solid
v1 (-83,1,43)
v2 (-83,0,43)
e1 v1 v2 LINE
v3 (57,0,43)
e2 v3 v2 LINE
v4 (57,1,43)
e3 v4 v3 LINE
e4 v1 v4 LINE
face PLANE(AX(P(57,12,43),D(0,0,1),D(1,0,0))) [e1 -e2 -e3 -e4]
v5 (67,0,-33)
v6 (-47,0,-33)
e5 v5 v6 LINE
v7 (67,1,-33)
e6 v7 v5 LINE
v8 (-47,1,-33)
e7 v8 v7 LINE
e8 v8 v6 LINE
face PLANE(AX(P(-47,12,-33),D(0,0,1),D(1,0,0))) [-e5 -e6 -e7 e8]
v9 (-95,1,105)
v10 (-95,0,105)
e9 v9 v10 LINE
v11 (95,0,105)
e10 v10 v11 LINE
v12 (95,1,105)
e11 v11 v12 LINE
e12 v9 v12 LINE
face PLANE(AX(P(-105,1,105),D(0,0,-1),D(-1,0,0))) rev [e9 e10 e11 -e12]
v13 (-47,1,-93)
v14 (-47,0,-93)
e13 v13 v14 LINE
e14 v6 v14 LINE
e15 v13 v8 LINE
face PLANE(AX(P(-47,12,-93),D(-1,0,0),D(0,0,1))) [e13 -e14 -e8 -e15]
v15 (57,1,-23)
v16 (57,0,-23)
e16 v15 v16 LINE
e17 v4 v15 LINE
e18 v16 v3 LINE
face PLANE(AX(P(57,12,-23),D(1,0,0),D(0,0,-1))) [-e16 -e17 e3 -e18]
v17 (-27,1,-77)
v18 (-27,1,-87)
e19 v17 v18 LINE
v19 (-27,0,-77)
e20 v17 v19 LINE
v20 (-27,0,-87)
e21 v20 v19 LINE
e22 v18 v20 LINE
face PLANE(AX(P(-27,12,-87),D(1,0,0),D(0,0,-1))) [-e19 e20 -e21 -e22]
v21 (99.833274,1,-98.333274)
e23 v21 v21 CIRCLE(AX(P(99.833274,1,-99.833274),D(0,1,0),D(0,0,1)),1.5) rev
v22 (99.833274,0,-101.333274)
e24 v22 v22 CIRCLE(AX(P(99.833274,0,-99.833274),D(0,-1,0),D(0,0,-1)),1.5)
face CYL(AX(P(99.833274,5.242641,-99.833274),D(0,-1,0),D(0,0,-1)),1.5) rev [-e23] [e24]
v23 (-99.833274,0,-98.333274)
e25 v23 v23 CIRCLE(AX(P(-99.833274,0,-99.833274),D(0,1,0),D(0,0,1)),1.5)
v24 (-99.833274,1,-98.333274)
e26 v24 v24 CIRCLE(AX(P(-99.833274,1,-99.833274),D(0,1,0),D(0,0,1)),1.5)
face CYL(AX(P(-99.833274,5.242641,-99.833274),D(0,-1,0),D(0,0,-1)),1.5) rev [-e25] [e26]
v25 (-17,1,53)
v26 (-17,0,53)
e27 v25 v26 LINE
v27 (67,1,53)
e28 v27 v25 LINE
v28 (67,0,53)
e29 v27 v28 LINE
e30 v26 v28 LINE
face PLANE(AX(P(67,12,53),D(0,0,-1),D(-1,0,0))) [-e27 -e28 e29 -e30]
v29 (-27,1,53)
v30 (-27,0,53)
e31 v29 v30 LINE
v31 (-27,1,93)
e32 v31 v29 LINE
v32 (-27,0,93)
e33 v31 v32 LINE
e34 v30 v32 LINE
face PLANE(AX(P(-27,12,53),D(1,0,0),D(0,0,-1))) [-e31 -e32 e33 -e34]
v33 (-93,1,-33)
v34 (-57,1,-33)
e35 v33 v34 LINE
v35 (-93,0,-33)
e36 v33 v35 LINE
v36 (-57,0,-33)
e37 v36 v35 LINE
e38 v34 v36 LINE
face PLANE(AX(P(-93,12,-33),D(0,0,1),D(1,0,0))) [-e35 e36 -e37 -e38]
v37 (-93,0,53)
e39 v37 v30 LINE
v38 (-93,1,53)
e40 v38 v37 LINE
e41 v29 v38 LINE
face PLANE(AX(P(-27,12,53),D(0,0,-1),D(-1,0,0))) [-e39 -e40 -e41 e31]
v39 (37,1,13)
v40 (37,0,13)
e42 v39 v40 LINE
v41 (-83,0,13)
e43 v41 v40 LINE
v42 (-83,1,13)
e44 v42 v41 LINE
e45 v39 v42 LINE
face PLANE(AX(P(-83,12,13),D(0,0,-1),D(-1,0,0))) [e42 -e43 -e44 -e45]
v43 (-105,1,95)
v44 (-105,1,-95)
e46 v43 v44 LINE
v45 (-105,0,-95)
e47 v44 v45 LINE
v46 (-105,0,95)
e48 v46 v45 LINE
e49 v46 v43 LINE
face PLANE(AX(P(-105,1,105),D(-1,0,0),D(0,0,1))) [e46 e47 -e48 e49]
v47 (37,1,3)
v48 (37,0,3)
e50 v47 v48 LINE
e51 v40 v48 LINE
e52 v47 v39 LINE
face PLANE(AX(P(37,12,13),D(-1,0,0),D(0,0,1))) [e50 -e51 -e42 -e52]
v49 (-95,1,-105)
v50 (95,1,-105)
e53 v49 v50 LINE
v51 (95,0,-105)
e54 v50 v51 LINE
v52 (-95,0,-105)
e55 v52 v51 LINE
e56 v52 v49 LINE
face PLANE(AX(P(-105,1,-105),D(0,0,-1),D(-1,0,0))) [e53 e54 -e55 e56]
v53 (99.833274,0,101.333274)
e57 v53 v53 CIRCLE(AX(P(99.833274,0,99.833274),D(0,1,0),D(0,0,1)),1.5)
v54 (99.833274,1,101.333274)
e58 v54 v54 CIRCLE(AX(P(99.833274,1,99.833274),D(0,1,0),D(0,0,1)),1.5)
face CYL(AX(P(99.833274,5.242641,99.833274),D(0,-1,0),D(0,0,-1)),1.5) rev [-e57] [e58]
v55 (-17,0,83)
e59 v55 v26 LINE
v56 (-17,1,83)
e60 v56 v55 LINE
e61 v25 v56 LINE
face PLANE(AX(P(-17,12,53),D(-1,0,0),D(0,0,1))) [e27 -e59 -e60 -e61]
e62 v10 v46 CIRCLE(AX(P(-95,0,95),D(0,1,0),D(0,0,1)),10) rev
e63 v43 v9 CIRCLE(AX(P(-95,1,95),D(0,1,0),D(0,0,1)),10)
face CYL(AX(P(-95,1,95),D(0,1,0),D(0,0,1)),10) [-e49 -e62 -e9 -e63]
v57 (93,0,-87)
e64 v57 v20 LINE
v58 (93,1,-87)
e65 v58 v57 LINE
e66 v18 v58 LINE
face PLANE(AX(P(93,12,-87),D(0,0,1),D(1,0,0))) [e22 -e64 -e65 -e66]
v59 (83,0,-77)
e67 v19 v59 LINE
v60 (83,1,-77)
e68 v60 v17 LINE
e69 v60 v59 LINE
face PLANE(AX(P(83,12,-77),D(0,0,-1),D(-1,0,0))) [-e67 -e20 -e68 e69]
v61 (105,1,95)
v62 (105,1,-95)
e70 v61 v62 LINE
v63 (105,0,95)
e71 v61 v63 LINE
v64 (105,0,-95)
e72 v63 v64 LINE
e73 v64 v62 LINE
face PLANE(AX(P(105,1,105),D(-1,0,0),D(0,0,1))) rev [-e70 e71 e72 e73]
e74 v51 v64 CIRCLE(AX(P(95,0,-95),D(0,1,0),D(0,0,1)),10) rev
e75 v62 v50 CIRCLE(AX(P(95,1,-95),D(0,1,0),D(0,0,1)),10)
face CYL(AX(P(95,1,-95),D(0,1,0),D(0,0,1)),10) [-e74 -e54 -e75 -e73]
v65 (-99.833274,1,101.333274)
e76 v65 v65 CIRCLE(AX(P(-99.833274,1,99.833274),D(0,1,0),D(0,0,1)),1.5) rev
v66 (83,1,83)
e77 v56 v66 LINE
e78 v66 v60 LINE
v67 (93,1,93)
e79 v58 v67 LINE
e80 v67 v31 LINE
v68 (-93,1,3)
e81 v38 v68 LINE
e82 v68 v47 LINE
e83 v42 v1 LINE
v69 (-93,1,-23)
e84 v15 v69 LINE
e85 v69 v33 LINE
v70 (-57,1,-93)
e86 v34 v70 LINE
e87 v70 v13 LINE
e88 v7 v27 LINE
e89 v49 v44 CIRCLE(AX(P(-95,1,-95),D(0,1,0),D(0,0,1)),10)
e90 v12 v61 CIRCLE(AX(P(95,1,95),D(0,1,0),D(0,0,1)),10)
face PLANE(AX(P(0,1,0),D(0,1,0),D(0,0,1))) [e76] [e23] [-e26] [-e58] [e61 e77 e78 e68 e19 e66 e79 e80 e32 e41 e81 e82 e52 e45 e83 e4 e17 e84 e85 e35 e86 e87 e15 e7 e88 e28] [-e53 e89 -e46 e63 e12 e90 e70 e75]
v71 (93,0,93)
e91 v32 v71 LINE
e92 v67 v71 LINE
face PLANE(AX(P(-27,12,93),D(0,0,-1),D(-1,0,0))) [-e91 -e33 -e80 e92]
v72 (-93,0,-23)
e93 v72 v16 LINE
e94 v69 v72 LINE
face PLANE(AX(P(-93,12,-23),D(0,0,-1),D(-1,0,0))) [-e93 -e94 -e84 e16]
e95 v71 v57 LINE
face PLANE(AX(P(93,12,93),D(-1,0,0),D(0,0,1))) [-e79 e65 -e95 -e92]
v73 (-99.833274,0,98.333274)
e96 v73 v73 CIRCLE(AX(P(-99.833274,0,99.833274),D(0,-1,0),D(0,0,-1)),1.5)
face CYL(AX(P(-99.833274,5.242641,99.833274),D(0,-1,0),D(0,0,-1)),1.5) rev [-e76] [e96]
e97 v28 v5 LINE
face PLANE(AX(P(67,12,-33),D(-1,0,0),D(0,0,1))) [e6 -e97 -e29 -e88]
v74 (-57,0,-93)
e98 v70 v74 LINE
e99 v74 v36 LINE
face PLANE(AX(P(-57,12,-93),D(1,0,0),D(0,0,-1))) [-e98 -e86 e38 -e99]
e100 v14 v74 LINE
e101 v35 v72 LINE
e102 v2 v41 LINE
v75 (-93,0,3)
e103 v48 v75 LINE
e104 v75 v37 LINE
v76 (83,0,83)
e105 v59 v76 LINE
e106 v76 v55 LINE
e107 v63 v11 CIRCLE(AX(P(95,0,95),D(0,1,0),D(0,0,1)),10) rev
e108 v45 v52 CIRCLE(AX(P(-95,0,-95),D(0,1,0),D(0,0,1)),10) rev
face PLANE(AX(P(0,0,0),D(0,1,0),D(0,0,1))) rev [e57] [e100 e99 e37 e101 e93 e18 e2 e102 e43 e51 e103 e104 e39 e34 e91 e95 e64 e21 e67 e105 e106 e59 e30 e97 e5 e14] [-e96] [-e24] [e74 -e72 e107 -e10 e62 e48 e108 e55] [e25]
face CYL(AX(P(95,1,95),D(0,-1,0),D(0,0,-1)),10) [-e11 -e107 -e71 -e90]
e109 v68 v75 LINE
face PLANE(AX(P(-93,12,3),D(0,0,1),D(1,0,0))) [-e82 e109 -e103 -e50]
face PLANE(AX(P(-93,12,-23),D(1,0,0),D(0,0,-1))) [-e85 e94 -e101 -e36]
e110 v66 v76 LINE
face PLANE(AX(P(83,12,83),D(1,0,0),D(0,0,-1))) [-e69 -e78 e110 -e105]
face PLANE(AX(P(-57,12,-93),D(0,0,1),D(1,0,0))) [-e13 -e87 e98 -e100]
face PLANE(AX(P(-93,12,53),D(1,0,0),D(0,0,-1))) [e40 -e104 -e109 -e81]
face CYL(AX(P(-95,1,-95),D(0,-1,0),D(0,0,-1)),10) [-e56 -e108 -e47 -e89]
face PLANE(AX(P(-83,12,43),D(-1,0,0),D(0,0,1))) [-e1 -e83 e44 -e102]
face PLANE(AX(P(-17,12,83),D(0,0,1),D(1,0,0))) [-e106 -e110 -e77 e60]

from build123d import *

# Parameters (mm, degrees)
SKETCH1_W         = 210
SKETCH1_H         = 210
MAINEXTRUDE_DEPTH = 1
SKETCH1_6_R       = 1.5
SCREWHOLES_DEPTH  = 1
ROUNDEDCORNERS_R  = 10
TRENCH_DEPTH      = 12


with BuildPart() as part:
    # Sketch1 → MainExtrude (new body)
    with BuildSketch(Plane(origin=(0, 0, 0), x_dir=(1, 0, 0), z_dir=(0, 1, 0))):
        Rectangle(SKETCH1_W, SKETCH1_H)
    extrude(amount=MAINEXTRUDE_DEPTH)

    # Sketch1<6> → ScrewHoles (cut)
    with BuildSketch(Plane(origin=(0, 0, 0), x_dir=(1, 0, 0), z_dir=(0, 1, 0))):
        with Locations(Location((-99.833273811, 99.833273811, 0), (0, 0, 270))):
            Circle(SKETCH1_6_R)
        with Locations(Location((-99.833273811, -99.833273811, 0), (0, 0, 90))):
            Circle(SKETCH1_6_R)
        with Locations(Location((99.833273811, -99.833273811, 0), (0, 0, 270))):
            Circle(SKETCH1_6_R)
        with Locations(Location((99.833273811, 99.833273811, 0), (0, 0, 90))):
            Circle(SKETCH1_6_R)
    extrude(amount=SCREWHOLES_DEPTH, mode=Mode.SUBTRACT)

    # RoundedCorners
    roundedcorners_edges = [part.edges().sort_by_distance(p)[0] for p in [
        (-105, 0.5, -105),
        (-105, 0.5, 105),
        (105, 0.5, 105),
        (105, 0.5, -105),
    ]]
    fillet(roundedcorners_edges, radius=ROUNDEDCORNERS_R)

    # Sketch3 → Trench (cut)
    with BuildSketch(Plane(origin=(0, 0, 0), x_dir=(1, 0, 0), z_dir=(0, 1, 0))):
        Polygon((-57, 93), (-57, 33), (-93, 33), (-93, 23), (57, 23), (57, -43), (-83, -43), (-83, -13), (37, -13), (37, -3), (-93, -3), (-93, -53), (-27, -53), (-27, -93), (93, -93), (93, 87), (-27, 87), (-27, 77), (83, 77), (83, -83), (-17, -83), (-17, -53), (67, -53), (67, 33), (-47, 33), (-47, 93), align=None)
    extrude(amount=TRENCH_DEPTH, mode=Mode.SUBTRACT)


solid = part.part
